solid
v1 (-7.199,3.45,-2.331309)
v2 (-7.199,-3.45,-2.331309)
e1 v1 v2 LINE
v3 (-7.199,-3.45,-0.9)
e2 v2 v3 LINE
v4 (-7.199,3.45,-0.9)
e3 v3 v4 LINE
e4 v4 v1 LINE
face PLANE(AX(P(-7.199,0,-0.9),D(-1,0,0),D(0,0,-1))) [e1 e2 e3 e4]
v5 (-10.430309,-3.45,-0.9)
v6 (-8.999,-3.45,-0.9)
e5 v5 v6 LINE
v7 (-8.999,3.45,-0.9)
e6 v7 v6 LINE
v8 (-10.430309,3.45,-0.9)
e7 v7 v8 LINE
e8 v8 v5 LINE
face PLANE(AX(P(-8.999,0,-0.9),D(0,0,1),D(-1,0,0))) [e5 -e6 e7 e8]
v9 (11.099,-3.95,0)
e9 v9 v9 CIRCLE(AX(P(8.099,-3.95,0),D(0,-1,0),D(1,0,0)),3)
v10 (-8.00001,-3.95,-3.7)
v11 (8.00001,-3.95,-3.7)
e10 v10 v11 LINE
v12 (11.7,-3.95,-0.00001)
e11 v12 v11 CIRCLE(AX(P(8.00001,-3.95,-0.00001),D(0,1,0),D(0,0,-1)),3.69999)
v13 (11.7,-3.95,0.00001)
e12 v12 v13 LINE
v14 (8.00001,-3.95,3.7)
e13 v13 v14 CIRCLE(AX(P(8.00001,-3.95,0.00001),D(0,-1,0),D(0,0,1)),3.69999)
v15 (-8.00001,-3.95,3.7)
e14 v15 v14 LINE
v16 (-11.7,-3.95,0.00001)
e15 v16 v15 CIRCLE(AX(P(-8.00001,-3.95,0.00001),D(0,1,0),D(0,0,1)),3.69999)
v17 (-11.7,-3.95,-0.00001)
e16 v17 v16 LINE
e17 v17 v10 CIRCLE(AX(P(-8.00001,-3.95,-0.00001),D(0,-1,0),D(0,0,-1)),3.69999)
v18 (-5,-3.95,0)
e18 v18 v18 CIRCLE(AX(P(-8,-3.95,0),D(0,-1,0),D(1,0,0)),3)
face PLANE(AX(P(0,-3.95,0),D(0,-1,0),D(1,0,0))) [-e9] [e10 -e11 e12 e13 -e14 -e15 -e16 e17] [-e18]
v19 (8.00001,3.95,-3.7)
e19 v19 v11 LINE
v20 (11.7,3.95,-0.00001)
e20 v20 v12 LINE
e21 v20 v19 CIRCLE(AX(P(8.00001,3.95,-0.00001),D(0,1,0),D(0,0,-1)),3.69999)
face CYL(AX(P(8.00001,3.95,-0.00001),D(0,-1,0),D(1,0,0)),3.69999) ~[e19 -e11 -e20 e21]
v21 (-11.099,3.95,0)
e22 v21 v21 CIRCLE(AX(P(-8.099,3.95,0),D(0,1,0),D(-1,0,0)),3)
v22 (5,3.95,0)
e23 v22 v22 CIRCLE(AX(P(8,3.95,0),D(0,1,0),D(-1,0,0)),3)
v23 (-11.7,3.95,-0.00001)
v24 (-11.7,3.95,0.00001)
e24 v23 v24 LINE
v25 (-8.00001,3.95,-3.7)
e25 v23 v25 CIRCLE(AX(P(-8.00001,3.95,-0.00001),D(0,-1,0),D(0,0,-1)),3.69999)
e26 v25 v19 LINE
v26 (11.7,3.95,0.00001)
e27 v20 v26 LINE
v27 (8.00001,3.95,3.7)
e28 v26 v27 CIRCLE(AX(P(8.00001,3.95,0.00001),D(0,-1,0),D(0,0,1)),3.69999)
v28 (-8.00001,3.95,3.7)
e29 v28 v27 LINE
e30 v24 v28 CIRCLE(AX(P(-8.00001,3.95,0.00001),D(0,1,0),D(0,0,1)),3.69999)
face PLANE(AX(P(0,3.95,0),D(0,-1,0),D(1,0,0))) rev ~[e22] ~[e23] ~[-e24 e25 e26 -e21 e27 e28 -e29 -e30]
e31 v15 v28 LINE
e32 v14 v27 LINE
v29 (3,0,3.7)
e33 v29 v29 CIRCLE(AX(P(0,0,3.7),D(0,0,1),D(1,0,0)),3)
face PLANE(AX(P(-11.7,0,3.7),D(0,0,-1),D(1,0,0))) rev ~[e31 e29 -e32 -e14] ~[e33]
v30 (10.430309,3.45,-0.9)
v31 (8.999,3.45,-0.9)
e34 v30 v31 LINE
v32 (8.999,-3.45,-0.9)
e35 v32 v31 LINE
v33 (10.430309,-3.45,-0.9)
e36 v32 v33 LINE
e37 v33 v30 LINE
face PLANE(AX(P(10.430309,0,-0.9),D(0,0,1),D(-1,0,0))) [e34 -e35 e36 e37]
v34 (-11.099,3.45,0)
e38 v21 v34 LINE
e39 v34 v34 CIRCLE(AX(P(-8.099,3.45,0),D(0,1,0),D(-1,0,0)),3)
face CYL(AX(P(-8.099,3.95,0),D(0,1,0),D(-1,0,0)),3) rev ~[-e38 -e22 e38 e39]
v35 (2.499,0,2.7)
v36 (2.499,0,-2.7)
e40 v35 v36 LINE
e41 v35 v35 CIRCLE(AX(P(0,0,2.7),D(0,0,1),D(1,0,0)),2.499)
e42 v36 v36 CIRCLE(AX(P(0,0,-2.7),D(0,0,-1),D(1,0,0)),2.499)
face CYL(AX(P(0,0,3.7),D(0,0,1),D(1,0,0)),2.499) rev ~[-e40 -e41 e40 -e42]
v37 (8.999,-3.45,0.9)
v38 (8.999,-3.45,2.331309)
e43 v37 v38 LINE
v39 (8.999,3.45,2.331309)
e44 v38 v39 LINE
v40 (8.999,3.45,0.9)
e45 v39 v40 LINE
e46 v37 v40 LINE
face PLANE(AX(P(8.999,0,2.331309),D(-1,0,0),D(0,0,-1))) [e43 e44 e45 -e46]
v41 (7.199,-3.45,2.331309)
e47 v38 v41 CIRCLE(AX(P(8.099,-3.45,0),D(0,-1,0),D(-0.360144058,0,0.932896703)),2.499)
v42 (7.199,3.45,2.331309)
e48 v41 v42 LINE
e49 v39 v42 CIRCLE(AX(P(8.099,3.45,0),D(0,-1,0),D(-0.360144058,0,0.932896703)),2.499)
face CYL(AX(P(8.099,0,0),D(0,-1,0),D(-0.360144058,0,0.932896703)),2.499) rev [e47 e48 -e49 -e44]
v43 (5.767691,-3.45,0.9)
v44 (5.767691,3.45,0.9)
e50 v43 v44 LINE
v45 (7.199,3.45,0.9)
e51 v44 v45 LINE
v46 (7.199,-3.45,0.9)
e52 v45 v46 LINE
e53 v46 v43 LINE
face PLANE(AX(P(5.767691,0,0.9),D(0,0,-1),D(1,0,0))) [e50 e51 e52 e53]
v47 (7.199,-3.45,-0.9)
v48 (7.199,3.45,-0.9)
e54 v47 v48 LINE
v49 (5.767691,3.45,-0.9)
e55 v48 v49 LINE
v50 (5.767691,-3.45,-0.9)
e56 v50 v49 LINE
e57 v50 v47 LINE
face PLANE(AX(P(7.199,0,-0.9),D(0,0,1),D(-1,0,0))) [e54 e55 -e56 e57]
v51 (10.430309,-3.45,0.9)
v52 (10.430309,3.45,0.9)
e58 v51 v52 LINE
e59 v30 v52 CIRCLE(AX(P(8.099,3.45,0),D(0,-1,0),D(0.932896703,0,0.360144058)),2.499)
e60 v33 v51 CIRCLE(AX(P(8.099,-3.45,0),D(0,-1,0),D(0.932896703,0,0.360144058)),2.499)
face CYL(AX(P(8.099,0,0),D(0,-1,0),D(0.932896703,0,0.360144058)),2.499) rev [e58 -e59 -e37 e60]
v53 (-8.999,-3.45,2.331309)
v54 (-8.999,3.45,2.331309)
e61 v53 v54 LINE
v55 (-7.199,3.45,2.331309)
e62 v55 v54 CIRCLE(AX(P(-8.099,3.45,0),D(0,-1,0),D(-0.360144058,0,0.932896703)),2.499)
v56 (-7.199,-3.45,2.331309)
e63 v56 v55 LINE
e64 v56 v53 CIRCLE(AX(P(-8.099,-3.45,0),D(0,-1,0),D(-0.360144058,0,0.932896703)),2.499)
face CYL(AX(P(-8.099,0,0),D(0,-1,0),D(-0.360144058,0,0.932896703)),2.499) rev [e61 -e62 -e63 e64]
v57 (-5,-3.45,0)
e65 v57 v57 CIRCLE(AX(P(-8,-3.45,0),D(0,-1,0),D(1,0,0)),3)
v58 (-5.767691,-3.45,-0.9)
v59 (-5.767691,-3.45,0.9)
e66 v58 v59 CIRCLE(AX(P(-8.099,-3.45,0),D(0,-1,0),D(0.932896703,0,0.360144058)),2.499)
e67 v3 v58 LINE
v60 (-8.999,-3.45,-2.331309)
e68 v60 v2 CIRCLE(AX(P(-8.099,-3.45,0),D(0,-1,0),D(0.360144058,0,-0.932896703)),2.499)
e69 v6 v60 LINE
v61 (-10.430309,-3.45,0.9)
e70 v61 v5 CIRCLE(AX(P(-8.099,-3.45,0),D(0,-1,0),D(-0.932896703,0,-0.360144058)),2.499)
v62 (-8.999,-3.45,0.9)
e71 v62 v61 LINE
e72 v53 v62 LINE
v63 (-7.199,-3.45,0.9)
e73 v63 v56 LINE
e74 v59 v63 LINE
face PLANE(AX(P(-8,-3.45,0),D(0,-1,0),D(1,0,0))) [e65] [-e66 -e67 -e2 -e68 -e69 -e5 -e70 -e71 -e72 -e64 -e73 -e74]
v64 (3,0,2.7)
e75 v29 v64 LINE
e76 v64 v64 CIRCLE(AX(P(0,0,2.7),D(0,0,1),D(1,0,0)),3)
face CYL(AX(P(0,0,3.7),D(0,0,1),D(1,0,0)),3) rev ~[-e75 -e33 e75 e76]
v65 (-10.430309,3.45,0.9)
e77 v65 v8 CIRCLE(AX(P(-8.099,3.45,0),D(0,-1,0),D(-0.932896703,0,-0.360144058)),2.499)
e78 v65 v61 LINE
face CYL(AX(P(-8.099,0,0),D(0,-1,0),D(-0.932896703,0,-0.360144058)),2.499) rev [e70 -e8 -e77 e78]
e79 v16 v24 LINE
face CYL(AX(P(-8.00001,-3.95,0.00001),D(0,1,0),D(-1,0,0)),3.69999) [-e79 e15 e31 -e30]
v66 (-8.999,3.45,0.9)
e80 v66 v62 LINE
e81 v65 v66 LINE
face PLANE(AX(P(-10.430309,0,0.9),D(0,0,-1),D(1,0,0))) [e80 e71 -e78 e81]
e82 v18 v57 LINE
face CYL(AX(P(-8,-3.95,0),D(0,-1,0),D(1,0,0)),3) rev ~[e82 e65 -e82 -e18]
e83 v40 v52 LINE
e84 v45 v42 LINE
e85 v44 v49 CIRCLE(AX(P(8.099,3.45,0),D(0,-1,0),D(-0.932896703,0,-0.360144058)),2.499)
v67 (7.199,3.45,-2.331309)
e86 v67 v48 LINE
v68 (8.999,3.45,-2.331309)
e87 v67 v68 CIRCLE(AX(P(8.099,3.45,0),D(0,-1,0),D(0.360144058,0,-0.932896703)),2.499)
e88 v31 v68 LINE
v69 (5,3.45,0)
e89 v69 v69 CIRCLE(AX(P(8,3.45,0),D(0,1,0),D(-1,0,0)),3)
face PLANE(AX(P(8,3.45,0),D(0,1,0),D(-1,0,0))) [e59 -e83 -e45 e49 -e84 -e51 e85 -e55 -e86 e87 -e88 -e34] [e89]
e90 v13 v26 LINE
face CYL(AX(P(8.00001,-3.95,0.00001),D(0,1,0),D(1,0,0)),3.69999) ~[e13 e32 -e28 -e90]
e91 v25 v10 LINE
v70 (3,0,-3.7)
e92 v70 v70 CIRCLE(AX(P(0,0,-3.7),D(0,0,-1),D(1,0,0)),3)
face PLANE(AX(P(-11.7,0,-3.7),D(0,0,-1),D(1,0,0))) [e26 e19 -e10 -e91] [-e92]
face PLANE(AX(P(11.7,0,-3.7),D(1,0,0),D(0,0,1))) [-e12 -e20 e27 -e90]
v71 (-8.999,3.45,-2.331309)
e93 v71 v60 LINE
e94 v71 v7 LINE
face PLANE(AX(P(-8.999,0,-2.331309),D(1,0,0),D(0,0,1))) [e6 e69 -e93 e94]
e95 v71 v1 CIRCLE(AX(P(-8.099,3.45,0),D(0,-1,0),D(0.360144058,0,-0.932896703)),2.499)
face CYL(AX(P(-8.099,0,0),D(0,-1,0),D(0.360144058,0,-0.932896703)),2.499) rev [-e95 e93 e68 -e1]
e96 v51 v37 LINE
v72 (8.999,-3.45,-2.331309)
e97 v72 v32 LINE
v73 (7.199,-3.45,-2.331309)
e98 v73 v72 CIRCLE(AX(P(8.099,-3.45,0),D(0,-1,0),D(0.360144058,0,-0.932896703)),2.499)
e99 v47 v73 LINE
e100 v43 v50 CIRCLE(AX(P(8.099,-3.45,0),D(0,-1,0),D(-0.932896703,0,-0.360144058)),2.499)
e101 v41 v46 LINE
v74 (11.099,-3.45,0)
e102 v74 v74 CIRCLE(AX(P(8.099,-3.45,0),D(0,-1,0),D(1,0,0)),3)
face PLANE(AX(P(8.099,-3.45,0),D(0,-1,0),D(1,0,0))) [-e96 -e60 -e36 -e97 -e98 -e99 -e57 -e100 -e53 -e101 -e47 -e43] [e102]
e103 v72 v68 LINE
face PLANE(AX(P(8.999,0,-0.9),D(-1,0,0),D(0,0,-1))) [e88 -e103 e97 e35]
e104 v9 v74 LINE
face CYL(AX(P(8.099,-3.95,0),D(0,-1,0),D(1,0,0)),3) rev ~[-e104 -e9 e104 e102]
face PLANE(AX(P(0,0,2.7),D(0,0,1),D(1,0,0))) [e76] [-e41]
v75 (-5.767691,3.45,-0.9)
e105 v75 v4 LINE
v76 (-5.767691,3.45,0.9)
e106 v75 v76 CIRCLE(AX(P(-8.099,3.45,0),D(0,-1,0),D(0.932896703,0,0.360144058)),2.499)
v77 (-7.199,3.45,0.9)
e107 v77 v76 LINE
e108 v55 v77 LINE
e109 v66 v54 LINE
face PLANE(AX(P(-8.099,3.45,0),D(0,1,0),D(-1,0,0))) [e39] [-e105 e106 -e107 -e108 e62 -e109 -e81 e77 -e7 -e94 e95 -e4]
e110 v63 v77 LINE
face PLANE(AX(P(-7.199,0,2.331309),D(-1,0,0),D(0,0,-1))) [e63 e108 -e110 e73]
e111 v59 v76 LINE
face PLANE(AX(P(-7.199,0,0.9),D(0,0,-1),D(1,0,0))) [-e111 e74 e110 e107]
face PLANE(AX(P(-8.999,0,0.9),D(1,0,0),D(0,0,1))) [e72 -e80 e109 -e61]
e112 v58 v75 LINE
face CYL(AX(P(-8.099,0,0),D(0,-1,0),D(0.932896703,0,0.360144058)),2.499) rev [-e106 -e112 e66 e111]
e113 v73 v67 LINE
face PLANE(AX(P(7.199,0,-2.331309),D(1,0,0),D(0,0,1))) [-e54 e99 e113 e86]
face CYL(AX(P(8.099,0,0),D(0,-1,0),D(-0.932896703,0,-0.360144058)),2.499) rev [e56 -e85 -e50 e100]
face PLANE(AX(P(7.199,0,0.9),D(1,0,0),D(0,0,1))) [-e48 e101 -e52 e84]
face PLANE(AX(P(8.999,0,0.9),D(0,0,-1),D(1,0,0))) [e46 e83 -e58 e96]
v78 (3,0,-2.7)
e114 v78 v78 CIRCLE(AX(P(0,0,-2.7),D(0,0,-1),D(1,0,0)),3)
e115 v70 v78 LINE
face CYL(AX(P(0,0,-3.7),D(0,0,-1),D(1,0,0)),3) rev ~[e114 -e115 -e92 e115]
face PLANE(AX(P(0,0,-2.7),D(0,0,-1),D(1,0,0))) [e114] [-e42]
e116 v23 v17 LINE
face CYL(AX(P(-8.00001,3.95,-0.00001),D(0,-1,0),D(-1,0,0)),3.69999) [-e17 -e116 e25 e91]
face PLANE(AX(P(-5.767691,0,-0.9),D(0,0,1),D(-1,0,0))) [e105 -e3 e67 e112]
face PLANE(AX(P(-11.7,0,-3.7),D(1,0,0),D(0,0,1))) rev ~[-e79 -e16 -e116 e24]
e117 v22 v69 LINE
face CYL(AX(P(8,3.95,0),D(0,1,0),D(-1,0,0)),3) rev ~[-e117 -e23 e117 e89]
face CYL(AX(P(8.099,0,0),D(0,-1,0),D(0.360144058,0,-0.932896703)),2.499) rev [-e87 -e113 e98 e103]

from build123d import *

# Parameters (mm, degrees)
F0_W      = 23.4
F0_H      = 7.4
F1_DEPTH  = 3.95
F2_R      = 3.69999
F3_R      = 2.499
F4_DEPTH  = 25
F3_R_2    = 3
F5_DEPTH  = 1
F6_R      = 3
F6_R_2    = 2.499
F7_DEPTH  = 1
F8_R      = 3
F9_DEPTH  = 0.5
F10_R     = 3
F11_DEPTH = 0.5


# Not quite as in the source:
# - a fillet or chamfer is up to 0.001 mm smaller than in the source, because OpenCascade refuses the exact size


with BuildPart() as f1:
    # F0 (on Front) → F1 (new body, symmetric)
    with BuildSketch(Plane.XZ):
        Rectangle(F0_W, F0_H)
        with BuildLine():
            ThreePointArc((-7.199, -2.3313088598), (-8.099, -2.499), (-8.999, -2.3313088598))
            Line((-8.999, -2.3313088598), (-8.999, -0.9))
            Line((-8.999, -0.9), (-10.4303088598, -0.9))
            ThreePointArc((-10.4303088598, -0.9), (-10.598, 0), (-10.4303088598, 0.9))
            Line((-10.4303088598, 0.9), (-8.999, 0.9))
            Line((-8.999, 0.9), (-8.999, 2.3313088598))
            ThreePointArc((-8.999, 2.3313088598), (-8.099, 2.499), (-7.199, 2.3313088598))
            Line((-7.199, 2.3313088598), (-7.199, 0.9))
            Line((-7.199, 0.9), (-5.7676911402, 0.9))
            ThreePointArc((-5.7676911402, 0.9), (-5.6, 0), (-5.7676911402, -0.9))
            Line((-5.7676911402, -0.9), (-7.199, -0.9))
            Line((-7.199, -0.9), (-7.199, -2.3313088598))
        make_face(mode=Mode.SUBTRACT)
        with BuildLine():
            Line((7.199, 0.9), (7.199, 2.3313088598))
            ThreePointArc((7.199, 2.3313088598), (8.099, 2.499), (8.999, 2.3313088598))
            Line((8.999, 2.3313088598), (8.999, 0.9))
            Line((8.999, 0.9), (10.4303088598, 0.9))
            ThreePointArc((10.4303088598, 0.9), (10.598, 0), (10.4303088598, -0.9))
            Line((10.4303088598, -0.9), (8.999, -0.9))
            Line((8.999, -0.9), (8.999, -2.3313088598))
            ThreePointArc((8.999, -2.3313088598), (8.099, -2.499), (7.199, -2.3313088598))
            Line((7.199, -2.3313088598), (7.199, -0.9))
            Line((7.199, -0.9), (5.7676911402, -0.9))
            ThreePointArc((5.7676911402, -0.9), (5.6, 0), (5.7676911402, 0.9))
            Line((5.7676911402, 0.9), (7.199, 0.9))
        make_face(mode=Mode.SUBTRACT)
    extrude(amount=F1_DEPTH, both=True)

    # F2 (radius 3.7 in the source; OpenCascade refuses exactly that, so slightly less here)
    f2_edges = [f1.edges().sort_by_distance(p)[0] for p in [
        (-11.7, 0, -3.7),
        (-11.7, 0, 3.7),
        (11.7, 0, 3.7),
        (11.7, 0, -3.7),
    ]]
    fillet(f2_edges, radius=F2_R)

    # F3 (on face) → F4 (cut)
    with BuildSketch(Plane.XY.offset(3.7)):
        Circle(F3_R)
    extrude(amount=-F4_DEPTH, mode=Mode.SUBTRACT)

    # F3 (on face) → F5 (cut)
    with BuildSketch(Plane.XY.offset(3.7)):
        Circle(F3_R_2)
        Circle(F3_R, mode=Mode.SUBTRACT)
    extrude(amount=-F5_DEPTH, mode=Mode.SUBTRACT)

    # F6 (on face) → F7 (cut)
    with BuildSketch(Plane(origin=(0, 0, -3.7), x_dir=(1, 0, 0), z_dir=(0, 0, -1))):
        Circle(F6_R)
        Circle(F6_R_2, mode=Mode.SUBTRACT)
    extrude(amount=-F7_DEPTH, mode=Mode.SUBTRACT)

    # F8 (on face) → F9 (cut)
    with BuildSketch(Plane.XZ.offset(3.95)):
        with Locations((-8, 0)):
            Circle(F8_R)
        with Locations((8.099, 0)):
            Circle(F8_R)
    extrude(amount=-F9_DEPTH, mode=Mode.SUBTRACT)

    # F10 (on face) → F11 (cut)
    with BuildSketch(Plane(origin=(0, 3.95, 0), x_dir=(-1, 0, 0), z_dir=(0, 1, 0))):
        with Locations((-8, 0)):
            Circle(F10_R)
        with Locations((8.099, 0)):
            Circle(F10_R)
    extrude(amount=-F11_DEPTH, mode=Mode.SUBTRACT)


solid = f1.part
